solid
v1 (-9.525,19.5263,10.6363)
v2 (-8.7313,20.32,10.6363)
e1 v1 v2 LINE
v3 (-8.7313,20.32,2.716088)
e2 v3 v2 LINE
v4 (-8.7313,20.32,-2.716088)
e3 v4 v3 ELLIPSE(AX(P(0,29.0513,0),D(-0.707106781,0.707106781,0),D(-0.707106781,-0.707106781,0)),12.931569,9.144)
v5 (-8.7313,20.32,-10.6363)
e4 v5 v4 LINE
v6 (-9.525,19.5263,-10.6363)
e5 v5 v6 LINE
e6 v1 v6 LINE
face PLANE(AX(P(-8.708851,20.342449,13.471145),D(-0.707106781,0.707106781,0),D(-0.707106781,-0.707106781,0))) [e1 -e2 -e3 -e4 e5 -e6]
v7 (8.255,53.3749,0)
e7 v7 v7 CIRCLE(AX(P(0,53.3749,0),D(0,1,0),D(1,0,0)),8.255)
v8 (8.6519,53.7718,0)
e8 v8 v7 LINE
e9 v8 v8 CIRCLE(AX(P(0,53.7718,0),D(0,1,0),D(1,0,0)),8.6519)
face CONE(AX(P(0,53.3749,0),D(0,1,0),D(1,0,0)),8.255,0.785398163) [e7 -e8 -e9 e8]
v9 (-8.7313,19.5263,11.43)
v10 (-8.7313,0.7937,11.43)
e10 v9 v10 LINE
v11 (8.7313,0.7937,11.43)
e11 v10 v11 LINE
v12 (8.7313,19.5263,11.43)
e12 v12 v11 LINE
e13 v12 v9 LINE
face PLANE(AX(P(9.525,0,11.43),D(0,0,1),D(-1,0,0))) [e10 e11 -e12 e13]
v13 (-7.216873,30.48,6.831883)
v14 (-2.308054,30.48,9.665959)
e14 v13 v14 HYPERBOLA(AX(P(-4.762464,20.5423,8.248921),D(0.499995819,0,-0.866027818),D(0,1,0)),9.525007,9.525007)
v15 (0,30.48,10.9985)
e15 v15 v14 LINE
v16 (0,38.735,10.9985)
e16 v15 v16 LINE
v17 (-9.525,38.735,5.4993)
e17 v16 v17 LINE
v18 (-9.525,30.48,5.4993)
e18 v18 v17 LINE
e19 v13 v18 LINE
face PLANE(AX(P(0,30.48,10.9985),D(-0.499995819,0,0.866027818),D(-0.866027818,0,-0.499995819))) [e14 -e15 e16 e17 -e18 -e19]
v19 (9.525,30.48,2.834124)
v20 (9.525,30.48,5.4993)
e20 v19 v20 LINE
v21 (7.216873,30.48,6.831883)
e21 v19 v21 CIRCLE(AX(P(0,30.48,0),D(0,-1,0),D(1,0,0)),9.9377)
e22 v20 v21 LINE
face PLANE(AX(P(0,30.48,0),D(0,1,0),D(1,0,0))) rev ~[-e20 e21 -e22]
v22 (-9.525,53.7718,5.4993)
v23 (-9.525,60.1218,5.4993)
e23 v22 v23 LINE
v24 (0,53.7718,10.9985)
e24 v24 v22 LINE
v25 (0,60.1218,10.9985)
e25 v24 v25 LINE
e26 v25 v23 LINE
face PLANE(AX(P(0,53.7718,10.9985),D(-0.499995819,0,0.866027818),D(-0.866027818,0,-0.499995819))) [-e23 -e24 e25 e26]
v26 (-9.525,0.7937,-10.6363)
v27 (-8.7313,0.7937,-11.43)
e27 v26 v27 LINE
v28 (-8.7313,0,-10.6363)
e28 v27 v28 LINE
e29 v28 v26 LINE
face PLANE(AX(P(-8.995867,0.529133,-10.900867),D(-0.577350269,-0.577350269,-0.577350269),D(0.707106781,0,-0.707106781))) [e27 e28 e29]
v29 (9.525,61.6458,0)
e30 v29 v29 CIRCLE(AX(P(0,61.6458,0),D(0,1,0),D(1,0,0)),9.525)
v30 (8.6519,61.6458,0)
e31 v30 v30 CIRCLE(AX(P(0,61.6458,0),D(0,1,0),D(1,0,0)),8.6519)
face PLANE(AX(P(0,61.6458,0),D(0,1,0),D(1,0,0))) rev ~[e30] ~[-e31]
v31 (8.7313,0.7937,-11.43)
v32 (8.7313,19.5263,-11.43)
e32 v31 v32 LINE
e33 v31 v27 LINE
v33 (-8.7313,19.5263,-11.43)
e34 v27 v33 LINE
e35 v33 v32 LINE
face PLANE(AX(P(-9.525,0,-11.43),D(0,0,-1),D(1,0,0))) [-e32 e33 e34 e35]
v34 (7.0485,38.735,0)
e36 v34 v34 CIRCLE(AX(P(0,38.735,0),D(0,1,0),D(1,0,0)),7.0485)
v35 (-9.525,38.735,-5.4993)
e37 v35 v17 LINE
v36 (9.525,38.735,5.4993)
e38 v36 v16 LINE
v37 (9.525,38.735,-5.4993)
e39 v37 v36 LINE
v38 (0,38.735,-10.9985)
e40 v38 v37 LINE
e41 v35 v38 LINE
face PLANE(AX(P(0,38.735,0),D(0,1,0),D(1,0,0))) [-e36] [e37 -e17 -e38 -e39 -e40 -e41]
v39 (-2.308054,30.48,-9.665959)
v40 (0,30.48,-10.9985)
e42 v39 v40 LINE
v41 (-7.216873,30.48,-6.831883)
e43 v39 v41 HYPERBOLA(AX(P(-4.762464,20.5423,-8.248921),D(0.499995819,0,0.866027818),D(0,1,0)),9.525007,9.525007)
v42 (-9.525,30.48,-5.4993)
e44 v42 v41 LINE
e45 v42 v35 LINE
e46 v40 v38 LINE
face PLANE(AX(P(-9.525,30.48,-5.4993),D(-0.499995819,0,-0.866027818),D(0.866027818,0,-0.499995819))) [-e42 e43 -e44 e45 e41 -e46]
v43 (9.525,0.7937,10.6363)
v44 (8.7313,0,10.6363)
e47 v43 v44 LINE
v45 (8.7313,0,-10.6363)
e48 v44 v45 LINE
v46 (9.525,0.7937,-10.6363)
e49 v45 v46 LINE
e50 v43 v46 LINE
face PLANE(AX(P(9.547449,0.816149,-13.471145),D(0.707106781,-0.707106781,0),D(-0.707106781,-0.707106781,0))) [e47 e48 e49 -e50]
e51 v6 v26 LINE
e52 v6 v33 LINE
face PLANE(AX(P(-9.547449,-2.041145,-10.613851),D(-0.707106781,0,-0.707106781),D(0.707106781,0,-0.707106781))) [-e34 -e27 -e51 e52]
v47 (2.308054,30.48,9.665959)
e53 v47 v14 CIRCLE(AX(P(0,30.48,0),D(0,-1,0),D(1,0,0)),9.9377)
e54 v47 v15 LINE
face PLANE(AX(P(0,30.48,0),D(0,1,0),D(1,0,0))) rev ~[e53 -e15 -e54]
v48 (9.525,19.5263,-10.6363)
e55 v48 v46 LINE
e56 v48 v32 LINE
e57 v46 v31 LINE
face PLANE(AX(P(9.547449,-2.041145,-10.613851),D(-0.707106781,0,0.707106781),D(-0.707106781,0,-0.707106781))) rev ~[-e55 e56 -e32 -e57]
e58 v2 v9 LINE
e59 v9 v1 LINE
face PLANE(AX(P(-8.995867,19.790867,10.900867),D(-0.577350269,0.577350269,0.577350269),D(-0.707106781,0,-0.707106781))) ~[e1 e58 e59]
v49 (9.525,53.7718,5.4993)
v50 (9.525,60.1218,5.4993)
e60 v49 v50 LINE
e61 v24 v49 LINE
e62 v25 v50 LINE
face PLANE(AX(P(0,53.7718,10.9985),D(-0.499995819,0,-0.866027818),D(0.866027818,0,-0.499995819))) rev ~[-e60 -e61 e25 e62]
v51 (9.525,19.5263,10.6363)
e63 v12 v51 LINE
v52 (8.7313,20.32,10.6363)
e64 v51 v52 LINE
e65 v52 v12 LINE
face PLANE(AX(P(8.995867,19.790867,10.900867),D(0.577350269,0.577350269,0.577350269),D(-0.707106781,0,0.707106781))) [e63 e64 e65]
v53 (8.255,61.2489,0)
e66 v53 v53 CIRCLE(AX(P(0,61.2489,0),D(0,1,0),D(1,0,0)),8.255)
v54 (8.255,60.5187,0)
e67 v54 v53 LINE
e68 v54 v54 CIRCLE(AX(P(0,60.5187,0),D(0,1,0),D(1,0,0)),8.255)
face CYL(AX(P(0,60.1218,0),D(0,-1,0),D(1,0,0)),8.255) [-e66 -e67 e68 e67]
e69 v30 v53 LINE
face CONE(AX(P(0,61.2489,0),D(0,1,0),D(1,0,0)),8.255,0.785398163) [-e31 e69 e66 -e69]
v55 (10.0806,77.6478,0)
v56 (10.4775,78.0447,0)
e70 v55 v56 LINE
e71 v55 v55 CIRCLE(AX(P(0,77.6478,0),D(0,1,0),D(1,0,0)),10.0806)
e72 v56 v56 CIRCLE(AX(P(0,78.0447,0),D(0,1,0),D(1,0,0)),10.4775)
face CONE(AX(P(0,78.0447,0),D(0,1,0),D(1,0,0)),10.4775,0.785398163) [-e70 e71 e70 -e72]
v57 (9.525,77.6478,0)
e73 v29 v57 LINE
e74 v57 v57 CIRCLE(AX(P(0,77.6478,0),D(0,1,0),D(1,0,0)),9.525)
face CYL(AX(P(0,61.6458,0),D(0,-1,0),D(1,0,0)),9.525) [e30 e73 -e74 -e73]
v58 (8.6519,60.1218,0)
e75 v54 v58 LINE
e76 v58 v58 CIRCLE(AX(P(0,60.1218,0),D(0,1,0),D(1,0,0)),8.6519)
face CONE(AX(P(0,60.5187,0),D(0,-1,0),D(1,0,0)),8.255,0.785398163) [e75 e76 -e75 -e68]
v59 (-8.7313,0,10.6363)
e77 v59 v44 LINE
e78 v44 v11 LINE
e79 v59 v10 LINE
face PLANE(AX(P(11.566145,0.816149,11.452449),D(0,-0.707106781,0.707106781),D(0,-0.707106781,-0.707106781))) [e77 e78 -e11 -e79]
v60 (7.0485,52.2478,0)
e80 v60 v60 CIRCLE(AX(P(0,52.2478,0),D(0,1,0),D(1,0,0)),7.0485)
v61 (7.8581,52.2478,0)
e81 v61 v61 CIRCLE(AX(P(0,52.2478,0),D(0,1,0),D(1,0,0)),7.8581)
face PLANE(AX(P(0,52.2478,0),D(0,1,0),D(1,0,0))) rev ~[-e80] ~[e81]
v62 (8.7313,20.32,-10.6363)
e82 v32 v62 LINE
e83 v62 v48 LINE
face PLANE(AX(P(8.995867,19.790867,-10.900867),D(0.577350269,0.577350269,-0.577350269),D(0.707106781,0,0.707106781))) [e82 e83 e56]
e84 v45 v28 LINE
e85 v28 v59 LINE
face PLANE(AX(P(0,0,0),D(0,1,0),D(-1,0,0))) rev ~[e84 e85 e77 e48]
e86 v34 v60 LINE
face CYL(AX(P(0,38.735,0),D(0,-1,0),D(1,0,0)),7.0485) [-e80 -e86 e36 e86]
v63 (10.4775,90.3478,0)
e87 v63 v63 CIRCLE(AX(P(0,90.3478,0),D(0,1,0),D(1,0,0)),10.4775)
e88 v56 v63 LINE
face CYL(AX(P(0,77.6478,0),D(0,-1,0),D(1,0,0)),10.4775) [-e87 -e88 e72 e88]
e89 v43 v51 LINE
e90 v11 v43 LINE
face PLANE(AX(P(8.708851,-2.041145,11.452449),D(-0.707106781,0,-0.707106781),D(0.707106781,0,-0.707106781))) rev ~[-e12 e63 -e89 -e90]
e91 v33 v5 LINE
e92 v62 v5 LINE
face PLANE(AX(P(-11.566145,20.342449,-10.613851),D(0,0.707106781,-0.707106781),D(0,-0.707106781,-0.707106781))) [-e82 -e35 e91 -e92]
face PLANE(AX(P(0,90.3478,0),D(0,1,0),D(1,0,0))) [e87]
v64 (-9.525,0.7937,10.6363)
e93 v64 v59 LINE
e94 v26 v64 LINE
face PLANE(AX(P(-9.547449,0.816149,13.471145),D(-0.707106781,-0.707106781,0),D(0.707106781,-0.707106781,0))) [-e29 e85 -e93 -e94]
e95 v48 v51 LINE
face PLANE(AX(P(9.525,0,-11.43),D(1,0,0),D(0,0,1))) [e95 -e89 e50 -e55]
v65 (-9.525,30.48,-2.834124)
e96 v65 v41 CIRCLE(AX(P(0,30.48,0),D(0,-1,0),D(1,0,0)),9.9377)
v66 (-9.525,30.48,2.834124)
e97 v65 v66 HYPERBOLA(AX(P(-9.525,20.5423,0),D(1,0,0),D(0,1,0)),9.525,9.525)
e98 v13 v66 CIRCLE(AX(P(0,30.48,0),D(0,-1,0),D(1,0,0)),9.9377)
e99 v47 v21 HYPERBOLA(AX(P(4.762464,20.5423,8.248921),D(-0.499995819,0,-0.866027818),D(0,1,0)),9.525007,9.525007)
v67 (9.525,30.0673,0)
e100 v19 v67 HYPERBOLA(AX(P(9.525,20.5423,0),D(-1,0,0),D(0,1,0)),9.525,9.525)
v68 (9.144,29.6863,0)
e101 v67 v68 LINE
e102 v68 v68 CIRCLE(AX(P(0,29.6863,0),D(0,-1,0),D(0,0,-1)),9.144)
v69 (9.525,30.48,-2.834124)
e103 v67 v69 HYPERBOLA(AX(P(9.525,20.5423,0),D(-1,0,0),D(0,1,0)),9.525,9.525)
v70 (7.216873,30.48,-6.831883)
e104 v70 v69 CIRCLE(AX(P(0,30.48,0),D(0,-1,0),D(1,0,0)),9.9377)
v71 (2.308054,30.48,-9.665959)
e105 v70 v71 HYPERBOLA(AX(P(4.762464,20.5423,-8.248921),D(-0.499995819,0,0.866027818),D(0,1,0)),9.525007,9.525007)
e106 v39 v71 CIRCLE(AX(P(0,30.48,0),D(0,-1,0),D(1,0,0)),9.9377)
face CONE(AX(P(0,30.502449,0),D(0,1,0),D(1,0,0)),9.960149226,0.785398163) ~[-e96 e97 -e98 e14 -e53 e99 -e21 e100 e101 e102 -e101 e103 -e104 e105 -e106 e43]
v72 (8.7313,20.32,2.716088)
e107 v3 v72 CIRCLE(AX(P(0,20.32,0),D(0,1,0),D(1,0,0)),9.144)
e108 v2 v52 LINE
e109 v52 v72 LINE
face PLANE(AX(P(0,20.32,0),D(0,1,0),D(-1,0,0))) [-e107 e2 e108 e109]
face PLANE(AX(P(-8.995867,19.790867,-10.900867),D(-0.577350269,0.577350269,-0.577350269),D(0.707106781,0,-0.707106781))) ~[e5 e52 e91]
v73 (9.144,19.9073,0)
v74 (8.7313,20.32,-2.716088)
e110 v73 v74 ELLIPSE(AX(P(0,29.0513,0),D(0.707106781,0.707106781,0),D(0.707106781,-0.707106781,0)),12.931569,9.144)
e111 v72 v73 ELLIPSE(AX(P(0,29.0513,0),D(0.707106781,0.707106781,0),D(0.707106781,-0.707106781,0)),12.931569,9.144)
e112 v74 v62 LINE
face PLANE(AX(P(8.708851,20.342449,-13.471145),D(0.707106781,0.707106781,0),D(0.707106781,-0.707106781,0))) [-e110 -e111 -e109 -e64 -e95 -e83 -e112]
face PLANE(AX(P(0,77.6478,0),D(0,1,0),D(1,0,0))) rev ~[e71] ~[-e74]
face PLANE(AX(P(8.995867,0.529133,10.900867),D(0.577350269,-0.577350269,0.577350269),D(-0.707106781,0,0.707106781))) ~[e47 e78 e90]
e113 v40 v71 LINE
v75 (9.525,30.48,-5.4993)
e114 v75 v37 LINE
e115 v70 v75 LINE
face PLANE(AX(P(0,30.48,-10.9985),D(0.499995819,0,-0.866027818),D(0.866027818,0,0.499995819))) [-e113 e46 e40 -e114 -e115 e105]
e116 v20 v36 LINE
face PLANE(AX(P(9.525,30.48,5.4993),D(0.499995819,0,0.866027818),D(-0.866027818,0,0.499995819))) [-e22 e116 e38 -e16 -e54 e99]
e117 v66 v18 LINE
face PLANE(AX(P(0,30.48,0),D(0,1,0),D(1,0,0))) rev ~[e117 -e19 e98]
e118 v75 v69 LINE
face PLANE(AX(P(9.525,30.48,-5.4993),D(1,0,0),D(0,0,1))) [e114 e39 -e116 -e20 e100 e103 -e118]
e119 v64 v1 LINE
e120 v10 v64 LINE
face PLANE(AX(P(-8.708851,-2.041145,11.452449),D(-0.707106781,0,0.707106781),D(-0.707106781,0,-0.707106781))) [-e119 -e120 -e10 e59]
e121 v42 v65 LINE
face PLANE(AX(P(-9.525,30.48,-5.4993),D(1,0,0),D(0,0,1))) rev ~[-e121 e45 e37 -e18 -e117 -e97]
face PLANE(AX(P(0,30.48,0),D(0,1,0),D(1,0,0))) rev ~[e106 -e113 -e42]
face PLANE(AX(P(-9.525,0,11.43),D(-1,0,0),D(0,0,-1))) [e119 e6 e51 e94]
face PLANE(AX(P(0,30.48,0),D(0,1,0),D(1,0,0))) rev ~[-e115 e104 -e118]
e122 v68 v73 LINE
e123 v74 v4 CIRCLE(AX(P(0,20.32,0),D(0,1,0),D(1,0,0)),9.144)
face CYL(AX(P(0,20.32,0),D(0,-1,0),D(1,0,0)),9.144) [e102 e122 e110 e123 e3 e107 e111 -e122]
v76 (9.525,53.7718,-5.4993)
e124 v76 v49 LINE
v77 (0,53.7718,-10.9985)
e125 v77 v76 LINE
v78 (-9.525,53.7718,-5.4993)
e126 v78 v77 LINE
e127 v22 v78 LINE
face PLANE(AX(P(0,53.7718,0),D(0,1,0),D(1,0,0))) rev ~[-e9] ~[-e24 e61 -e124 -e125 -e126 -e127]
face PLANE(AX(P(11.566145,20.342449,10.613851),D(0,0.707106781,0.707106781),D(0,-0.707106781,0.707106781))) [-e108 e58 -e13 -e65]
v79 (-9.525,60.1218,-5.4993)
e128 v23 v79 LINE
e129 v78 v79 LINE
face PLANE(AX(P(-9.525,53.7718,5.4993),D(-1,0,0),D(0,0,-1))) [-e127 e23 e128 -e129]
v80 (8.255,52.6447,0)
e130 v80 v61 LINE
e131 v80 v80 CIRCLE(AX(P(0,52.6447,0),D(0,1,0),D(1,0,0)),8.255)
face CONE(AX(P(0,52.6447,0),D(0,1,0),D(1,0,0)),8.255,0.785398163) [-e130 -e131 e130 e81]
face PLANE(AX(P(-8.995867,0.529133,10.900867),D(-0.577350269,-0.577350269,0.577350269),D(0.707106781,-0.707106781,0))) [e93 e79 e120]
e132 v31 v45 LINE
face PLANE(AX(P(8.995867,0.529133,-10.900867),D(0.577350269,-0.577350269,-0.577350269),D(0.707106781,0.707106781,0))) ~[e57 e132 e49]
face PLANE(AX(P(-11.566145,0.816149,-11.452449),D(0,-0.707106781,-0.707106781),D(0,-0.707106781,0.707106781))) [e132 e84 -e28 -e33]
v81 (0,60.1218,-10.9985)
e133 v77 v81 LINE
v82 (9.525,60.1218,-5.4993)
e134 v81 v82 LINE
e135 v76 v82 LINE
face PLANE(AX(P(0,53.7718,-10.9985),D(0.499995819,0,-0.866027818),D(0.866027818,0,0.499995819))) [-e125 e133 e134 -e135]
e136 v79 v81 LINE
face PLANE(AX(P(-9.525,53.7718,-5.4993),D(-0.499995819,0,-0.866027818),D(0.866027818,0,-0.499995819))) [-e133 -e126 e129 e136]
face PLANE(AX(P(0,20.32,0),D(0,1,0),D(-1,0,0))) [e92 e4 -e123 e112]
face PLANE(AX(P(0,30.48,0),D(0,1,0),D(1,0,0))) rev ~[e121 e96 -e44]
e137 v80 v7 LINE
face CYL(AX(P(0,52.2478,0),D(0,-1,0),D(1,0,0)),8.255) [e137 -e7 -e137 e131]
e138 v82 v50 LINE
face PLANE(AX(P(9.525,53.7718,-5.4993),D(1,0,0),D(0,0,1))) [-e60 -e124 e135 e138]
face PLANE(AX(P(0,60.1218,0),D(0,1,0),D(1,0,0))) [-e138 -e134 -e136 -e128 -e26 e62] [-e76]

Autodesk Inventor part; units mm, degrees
ref_plane "YZ Plane" through (0, 0, 0) normal (1, 0, 0) x (0, 1, 0)
ref_plane "XZ Plane" through (0, 0, 0) normal (0, 1, 0) x (-1, 0, 0)
ref_plane "XY Plane" through (0, 0, 0) normal (0, 0, 1) x (1, 0, 0)
sketch "Sketch1" plane through (0, 0, 0) normal (0, 1, 0) x (-1, 0, 0)
  line L0 (-9.525, 11.43) -> (9.525, 11.43)
  line L1 (9.525, 11.43) -> (9.525, -11.43)
  line L2 (9.525, -11.43) -> (-9.525, -11.43)
  line L3 (-9.525, -11.43) -> (-9.525, 11.43)
  line L4 (-9.525, 11.43) -> (9.525, -11.43) construction
  line L5 (9.525, 11.43) -> (-9.525, -11.43) construction
  point P0 (0, 0)
  dimension "d0" = 19.05
  dimension "d1" = 22.86
extrude "Extrusion1" add sketch "Sketch1" along normal blind 20.32
sketch "Sketch2" plane through (0, 20.32, 0) normal (0, 1, 0) x (1, 0, 0)
  circle A0 centre (0, 0) radius 9.144
  dimension "d4" = 18.288
extrude "Extrusion2" add sketch "Sketch2" along normal blind 10.16
sketch "Sketch3" plane through (0, 30.48, 0) normal (0, 1, 0) x (1, 0, 0)
  line L0 (-9.525, 11.43) -> (-9.525, -11.43) projected
  line L1 (-9.525, 5.4993) -> (0, 10.9985)
  line L2 (0, 10.9985) -> (9.525, 5.4993)
  line L3 (9.525, 5.4993) -> (9.525, -5.4993)
  line L4 (9.525, -5.4993) -> (0, -10.9985)
  line L5 (0, -10.9985) -> (-9.525, -5.4993)
  line L6 (-9.525, -5.4993) -> (-9.525, 5.4993)
  point P0 (0, 0)
  point P1 (0, 0)
  point P2 (-9.525, 0)
extrude "Extrusion3" add sketch "Sketch3" along normal blind 8.255
chamfer "Chamfer1" distance 0.7937 angle 45 13 edges at (9.525, 10.16, 11.43) (-9.525, 10.16, 11.43) (9.525, 10.16, -11.43) (-9.525, 10.16, -11.43) (0, 0, -11.43) (9.525, 0, 0) (0, 0, 11.43) (-9.525, 0, 0) (9.525, 20.32, 0) (0, 20.32, 11.43) (-9.525, 20.32, 0) (0, 20.32, -11.43) (-9.144, 30.48, 0)
sketch "Sketch4" plane through (0, 38.735, 0) normal (0, 1, 0) x (1, 0, 0)
  circle A0 centre (0, 0) radius 7.0485
  dimension "d12" = 14.097
extrude "Extrusion4" add sketch "Sketch4" along normal blind 13.5128
sketch "Sketch5" plane through (0, 52.2478, 0) normal (0, 1, 0) x (1, 0, 0)
  circle A0 centre (0, 0) radius 8.255
  dimension "d15" = 16.51
extrude "Extrusion5" add sketch "Sketch5" along normal blind 1.524
sketch "Sketch6" plane through (0, 53.7718, 0) normal (0, 1, 0) x (1, 0, 0)
  line L0 (0, -10.9985) -> (9.525, -5.4993) projected
  line L1 (0, -10.9985) -> (-9.525, -5.4993)
  line L2 (-9.525, -5.4993) -> (-9.525, 5.4993)
  line L3 (-9.525, 5.4993) -> (0, 10.9985)
  line L4 (0, 10.9985) -> (9.525, 5.4993)
  line L5 (9.525, 5.4993) -> (9.525, -5.4993)
  line L6 (9.525, -5.4993) -> (0, -10.9985)
  point P0 (0, 0)
  point P1 (0, 0)
extrude "Extrusion6" add sketch "Sketch6" along normal blind 6.35
sketch "Sketch7" plane through (0, 60.1218, 0) normal (0, 1, 0) x (1, 0, 0)
  circle A0 centre (0, 0) radius 8.255
  dimension "d20" = 16.51
extrude "Extrusion7" add sketch "Sketch7" along normal blind 1.524
sketch "Sketch8" plane through (0, 61.6458, 0) normal (0, 1, 0) x (1, 0, 0)
  circle A0 centre (0, 0) radius 9.525
  dimension "d23" = 19.05
extrude "Extrusion8" add sketch "Sketch8" along normal blind 16.002
sketch "Sketch9" plane through (0, 77.6478, 0) normal (0, 1, 0) x (1, 0, 0)
  circle A0 centre (0, 0) radius 10.4775
  dimension "d26" = 20.955
extrude "Extrusion9" add sketch "Sketch9" along normal blind 12.7
thread "Thread1" size "9/16-12 UNC" class "2A" standard "ANSI Unified Screw Threads" full length
chamfer "Chamfer2" distance 0.3969 angle 45 4 edges at (-8.255, 52.2478, 0) (-8.255, 53.7718, 0) (-8.255, 60.1218, 0) (-8.255, 61.6458, 0)
chamfer "Chamfer3" distance 0.3969 angle 45 1 edges at (-10.4775, 77.6478, 0)
properties part number "NeedleValveCAD"
